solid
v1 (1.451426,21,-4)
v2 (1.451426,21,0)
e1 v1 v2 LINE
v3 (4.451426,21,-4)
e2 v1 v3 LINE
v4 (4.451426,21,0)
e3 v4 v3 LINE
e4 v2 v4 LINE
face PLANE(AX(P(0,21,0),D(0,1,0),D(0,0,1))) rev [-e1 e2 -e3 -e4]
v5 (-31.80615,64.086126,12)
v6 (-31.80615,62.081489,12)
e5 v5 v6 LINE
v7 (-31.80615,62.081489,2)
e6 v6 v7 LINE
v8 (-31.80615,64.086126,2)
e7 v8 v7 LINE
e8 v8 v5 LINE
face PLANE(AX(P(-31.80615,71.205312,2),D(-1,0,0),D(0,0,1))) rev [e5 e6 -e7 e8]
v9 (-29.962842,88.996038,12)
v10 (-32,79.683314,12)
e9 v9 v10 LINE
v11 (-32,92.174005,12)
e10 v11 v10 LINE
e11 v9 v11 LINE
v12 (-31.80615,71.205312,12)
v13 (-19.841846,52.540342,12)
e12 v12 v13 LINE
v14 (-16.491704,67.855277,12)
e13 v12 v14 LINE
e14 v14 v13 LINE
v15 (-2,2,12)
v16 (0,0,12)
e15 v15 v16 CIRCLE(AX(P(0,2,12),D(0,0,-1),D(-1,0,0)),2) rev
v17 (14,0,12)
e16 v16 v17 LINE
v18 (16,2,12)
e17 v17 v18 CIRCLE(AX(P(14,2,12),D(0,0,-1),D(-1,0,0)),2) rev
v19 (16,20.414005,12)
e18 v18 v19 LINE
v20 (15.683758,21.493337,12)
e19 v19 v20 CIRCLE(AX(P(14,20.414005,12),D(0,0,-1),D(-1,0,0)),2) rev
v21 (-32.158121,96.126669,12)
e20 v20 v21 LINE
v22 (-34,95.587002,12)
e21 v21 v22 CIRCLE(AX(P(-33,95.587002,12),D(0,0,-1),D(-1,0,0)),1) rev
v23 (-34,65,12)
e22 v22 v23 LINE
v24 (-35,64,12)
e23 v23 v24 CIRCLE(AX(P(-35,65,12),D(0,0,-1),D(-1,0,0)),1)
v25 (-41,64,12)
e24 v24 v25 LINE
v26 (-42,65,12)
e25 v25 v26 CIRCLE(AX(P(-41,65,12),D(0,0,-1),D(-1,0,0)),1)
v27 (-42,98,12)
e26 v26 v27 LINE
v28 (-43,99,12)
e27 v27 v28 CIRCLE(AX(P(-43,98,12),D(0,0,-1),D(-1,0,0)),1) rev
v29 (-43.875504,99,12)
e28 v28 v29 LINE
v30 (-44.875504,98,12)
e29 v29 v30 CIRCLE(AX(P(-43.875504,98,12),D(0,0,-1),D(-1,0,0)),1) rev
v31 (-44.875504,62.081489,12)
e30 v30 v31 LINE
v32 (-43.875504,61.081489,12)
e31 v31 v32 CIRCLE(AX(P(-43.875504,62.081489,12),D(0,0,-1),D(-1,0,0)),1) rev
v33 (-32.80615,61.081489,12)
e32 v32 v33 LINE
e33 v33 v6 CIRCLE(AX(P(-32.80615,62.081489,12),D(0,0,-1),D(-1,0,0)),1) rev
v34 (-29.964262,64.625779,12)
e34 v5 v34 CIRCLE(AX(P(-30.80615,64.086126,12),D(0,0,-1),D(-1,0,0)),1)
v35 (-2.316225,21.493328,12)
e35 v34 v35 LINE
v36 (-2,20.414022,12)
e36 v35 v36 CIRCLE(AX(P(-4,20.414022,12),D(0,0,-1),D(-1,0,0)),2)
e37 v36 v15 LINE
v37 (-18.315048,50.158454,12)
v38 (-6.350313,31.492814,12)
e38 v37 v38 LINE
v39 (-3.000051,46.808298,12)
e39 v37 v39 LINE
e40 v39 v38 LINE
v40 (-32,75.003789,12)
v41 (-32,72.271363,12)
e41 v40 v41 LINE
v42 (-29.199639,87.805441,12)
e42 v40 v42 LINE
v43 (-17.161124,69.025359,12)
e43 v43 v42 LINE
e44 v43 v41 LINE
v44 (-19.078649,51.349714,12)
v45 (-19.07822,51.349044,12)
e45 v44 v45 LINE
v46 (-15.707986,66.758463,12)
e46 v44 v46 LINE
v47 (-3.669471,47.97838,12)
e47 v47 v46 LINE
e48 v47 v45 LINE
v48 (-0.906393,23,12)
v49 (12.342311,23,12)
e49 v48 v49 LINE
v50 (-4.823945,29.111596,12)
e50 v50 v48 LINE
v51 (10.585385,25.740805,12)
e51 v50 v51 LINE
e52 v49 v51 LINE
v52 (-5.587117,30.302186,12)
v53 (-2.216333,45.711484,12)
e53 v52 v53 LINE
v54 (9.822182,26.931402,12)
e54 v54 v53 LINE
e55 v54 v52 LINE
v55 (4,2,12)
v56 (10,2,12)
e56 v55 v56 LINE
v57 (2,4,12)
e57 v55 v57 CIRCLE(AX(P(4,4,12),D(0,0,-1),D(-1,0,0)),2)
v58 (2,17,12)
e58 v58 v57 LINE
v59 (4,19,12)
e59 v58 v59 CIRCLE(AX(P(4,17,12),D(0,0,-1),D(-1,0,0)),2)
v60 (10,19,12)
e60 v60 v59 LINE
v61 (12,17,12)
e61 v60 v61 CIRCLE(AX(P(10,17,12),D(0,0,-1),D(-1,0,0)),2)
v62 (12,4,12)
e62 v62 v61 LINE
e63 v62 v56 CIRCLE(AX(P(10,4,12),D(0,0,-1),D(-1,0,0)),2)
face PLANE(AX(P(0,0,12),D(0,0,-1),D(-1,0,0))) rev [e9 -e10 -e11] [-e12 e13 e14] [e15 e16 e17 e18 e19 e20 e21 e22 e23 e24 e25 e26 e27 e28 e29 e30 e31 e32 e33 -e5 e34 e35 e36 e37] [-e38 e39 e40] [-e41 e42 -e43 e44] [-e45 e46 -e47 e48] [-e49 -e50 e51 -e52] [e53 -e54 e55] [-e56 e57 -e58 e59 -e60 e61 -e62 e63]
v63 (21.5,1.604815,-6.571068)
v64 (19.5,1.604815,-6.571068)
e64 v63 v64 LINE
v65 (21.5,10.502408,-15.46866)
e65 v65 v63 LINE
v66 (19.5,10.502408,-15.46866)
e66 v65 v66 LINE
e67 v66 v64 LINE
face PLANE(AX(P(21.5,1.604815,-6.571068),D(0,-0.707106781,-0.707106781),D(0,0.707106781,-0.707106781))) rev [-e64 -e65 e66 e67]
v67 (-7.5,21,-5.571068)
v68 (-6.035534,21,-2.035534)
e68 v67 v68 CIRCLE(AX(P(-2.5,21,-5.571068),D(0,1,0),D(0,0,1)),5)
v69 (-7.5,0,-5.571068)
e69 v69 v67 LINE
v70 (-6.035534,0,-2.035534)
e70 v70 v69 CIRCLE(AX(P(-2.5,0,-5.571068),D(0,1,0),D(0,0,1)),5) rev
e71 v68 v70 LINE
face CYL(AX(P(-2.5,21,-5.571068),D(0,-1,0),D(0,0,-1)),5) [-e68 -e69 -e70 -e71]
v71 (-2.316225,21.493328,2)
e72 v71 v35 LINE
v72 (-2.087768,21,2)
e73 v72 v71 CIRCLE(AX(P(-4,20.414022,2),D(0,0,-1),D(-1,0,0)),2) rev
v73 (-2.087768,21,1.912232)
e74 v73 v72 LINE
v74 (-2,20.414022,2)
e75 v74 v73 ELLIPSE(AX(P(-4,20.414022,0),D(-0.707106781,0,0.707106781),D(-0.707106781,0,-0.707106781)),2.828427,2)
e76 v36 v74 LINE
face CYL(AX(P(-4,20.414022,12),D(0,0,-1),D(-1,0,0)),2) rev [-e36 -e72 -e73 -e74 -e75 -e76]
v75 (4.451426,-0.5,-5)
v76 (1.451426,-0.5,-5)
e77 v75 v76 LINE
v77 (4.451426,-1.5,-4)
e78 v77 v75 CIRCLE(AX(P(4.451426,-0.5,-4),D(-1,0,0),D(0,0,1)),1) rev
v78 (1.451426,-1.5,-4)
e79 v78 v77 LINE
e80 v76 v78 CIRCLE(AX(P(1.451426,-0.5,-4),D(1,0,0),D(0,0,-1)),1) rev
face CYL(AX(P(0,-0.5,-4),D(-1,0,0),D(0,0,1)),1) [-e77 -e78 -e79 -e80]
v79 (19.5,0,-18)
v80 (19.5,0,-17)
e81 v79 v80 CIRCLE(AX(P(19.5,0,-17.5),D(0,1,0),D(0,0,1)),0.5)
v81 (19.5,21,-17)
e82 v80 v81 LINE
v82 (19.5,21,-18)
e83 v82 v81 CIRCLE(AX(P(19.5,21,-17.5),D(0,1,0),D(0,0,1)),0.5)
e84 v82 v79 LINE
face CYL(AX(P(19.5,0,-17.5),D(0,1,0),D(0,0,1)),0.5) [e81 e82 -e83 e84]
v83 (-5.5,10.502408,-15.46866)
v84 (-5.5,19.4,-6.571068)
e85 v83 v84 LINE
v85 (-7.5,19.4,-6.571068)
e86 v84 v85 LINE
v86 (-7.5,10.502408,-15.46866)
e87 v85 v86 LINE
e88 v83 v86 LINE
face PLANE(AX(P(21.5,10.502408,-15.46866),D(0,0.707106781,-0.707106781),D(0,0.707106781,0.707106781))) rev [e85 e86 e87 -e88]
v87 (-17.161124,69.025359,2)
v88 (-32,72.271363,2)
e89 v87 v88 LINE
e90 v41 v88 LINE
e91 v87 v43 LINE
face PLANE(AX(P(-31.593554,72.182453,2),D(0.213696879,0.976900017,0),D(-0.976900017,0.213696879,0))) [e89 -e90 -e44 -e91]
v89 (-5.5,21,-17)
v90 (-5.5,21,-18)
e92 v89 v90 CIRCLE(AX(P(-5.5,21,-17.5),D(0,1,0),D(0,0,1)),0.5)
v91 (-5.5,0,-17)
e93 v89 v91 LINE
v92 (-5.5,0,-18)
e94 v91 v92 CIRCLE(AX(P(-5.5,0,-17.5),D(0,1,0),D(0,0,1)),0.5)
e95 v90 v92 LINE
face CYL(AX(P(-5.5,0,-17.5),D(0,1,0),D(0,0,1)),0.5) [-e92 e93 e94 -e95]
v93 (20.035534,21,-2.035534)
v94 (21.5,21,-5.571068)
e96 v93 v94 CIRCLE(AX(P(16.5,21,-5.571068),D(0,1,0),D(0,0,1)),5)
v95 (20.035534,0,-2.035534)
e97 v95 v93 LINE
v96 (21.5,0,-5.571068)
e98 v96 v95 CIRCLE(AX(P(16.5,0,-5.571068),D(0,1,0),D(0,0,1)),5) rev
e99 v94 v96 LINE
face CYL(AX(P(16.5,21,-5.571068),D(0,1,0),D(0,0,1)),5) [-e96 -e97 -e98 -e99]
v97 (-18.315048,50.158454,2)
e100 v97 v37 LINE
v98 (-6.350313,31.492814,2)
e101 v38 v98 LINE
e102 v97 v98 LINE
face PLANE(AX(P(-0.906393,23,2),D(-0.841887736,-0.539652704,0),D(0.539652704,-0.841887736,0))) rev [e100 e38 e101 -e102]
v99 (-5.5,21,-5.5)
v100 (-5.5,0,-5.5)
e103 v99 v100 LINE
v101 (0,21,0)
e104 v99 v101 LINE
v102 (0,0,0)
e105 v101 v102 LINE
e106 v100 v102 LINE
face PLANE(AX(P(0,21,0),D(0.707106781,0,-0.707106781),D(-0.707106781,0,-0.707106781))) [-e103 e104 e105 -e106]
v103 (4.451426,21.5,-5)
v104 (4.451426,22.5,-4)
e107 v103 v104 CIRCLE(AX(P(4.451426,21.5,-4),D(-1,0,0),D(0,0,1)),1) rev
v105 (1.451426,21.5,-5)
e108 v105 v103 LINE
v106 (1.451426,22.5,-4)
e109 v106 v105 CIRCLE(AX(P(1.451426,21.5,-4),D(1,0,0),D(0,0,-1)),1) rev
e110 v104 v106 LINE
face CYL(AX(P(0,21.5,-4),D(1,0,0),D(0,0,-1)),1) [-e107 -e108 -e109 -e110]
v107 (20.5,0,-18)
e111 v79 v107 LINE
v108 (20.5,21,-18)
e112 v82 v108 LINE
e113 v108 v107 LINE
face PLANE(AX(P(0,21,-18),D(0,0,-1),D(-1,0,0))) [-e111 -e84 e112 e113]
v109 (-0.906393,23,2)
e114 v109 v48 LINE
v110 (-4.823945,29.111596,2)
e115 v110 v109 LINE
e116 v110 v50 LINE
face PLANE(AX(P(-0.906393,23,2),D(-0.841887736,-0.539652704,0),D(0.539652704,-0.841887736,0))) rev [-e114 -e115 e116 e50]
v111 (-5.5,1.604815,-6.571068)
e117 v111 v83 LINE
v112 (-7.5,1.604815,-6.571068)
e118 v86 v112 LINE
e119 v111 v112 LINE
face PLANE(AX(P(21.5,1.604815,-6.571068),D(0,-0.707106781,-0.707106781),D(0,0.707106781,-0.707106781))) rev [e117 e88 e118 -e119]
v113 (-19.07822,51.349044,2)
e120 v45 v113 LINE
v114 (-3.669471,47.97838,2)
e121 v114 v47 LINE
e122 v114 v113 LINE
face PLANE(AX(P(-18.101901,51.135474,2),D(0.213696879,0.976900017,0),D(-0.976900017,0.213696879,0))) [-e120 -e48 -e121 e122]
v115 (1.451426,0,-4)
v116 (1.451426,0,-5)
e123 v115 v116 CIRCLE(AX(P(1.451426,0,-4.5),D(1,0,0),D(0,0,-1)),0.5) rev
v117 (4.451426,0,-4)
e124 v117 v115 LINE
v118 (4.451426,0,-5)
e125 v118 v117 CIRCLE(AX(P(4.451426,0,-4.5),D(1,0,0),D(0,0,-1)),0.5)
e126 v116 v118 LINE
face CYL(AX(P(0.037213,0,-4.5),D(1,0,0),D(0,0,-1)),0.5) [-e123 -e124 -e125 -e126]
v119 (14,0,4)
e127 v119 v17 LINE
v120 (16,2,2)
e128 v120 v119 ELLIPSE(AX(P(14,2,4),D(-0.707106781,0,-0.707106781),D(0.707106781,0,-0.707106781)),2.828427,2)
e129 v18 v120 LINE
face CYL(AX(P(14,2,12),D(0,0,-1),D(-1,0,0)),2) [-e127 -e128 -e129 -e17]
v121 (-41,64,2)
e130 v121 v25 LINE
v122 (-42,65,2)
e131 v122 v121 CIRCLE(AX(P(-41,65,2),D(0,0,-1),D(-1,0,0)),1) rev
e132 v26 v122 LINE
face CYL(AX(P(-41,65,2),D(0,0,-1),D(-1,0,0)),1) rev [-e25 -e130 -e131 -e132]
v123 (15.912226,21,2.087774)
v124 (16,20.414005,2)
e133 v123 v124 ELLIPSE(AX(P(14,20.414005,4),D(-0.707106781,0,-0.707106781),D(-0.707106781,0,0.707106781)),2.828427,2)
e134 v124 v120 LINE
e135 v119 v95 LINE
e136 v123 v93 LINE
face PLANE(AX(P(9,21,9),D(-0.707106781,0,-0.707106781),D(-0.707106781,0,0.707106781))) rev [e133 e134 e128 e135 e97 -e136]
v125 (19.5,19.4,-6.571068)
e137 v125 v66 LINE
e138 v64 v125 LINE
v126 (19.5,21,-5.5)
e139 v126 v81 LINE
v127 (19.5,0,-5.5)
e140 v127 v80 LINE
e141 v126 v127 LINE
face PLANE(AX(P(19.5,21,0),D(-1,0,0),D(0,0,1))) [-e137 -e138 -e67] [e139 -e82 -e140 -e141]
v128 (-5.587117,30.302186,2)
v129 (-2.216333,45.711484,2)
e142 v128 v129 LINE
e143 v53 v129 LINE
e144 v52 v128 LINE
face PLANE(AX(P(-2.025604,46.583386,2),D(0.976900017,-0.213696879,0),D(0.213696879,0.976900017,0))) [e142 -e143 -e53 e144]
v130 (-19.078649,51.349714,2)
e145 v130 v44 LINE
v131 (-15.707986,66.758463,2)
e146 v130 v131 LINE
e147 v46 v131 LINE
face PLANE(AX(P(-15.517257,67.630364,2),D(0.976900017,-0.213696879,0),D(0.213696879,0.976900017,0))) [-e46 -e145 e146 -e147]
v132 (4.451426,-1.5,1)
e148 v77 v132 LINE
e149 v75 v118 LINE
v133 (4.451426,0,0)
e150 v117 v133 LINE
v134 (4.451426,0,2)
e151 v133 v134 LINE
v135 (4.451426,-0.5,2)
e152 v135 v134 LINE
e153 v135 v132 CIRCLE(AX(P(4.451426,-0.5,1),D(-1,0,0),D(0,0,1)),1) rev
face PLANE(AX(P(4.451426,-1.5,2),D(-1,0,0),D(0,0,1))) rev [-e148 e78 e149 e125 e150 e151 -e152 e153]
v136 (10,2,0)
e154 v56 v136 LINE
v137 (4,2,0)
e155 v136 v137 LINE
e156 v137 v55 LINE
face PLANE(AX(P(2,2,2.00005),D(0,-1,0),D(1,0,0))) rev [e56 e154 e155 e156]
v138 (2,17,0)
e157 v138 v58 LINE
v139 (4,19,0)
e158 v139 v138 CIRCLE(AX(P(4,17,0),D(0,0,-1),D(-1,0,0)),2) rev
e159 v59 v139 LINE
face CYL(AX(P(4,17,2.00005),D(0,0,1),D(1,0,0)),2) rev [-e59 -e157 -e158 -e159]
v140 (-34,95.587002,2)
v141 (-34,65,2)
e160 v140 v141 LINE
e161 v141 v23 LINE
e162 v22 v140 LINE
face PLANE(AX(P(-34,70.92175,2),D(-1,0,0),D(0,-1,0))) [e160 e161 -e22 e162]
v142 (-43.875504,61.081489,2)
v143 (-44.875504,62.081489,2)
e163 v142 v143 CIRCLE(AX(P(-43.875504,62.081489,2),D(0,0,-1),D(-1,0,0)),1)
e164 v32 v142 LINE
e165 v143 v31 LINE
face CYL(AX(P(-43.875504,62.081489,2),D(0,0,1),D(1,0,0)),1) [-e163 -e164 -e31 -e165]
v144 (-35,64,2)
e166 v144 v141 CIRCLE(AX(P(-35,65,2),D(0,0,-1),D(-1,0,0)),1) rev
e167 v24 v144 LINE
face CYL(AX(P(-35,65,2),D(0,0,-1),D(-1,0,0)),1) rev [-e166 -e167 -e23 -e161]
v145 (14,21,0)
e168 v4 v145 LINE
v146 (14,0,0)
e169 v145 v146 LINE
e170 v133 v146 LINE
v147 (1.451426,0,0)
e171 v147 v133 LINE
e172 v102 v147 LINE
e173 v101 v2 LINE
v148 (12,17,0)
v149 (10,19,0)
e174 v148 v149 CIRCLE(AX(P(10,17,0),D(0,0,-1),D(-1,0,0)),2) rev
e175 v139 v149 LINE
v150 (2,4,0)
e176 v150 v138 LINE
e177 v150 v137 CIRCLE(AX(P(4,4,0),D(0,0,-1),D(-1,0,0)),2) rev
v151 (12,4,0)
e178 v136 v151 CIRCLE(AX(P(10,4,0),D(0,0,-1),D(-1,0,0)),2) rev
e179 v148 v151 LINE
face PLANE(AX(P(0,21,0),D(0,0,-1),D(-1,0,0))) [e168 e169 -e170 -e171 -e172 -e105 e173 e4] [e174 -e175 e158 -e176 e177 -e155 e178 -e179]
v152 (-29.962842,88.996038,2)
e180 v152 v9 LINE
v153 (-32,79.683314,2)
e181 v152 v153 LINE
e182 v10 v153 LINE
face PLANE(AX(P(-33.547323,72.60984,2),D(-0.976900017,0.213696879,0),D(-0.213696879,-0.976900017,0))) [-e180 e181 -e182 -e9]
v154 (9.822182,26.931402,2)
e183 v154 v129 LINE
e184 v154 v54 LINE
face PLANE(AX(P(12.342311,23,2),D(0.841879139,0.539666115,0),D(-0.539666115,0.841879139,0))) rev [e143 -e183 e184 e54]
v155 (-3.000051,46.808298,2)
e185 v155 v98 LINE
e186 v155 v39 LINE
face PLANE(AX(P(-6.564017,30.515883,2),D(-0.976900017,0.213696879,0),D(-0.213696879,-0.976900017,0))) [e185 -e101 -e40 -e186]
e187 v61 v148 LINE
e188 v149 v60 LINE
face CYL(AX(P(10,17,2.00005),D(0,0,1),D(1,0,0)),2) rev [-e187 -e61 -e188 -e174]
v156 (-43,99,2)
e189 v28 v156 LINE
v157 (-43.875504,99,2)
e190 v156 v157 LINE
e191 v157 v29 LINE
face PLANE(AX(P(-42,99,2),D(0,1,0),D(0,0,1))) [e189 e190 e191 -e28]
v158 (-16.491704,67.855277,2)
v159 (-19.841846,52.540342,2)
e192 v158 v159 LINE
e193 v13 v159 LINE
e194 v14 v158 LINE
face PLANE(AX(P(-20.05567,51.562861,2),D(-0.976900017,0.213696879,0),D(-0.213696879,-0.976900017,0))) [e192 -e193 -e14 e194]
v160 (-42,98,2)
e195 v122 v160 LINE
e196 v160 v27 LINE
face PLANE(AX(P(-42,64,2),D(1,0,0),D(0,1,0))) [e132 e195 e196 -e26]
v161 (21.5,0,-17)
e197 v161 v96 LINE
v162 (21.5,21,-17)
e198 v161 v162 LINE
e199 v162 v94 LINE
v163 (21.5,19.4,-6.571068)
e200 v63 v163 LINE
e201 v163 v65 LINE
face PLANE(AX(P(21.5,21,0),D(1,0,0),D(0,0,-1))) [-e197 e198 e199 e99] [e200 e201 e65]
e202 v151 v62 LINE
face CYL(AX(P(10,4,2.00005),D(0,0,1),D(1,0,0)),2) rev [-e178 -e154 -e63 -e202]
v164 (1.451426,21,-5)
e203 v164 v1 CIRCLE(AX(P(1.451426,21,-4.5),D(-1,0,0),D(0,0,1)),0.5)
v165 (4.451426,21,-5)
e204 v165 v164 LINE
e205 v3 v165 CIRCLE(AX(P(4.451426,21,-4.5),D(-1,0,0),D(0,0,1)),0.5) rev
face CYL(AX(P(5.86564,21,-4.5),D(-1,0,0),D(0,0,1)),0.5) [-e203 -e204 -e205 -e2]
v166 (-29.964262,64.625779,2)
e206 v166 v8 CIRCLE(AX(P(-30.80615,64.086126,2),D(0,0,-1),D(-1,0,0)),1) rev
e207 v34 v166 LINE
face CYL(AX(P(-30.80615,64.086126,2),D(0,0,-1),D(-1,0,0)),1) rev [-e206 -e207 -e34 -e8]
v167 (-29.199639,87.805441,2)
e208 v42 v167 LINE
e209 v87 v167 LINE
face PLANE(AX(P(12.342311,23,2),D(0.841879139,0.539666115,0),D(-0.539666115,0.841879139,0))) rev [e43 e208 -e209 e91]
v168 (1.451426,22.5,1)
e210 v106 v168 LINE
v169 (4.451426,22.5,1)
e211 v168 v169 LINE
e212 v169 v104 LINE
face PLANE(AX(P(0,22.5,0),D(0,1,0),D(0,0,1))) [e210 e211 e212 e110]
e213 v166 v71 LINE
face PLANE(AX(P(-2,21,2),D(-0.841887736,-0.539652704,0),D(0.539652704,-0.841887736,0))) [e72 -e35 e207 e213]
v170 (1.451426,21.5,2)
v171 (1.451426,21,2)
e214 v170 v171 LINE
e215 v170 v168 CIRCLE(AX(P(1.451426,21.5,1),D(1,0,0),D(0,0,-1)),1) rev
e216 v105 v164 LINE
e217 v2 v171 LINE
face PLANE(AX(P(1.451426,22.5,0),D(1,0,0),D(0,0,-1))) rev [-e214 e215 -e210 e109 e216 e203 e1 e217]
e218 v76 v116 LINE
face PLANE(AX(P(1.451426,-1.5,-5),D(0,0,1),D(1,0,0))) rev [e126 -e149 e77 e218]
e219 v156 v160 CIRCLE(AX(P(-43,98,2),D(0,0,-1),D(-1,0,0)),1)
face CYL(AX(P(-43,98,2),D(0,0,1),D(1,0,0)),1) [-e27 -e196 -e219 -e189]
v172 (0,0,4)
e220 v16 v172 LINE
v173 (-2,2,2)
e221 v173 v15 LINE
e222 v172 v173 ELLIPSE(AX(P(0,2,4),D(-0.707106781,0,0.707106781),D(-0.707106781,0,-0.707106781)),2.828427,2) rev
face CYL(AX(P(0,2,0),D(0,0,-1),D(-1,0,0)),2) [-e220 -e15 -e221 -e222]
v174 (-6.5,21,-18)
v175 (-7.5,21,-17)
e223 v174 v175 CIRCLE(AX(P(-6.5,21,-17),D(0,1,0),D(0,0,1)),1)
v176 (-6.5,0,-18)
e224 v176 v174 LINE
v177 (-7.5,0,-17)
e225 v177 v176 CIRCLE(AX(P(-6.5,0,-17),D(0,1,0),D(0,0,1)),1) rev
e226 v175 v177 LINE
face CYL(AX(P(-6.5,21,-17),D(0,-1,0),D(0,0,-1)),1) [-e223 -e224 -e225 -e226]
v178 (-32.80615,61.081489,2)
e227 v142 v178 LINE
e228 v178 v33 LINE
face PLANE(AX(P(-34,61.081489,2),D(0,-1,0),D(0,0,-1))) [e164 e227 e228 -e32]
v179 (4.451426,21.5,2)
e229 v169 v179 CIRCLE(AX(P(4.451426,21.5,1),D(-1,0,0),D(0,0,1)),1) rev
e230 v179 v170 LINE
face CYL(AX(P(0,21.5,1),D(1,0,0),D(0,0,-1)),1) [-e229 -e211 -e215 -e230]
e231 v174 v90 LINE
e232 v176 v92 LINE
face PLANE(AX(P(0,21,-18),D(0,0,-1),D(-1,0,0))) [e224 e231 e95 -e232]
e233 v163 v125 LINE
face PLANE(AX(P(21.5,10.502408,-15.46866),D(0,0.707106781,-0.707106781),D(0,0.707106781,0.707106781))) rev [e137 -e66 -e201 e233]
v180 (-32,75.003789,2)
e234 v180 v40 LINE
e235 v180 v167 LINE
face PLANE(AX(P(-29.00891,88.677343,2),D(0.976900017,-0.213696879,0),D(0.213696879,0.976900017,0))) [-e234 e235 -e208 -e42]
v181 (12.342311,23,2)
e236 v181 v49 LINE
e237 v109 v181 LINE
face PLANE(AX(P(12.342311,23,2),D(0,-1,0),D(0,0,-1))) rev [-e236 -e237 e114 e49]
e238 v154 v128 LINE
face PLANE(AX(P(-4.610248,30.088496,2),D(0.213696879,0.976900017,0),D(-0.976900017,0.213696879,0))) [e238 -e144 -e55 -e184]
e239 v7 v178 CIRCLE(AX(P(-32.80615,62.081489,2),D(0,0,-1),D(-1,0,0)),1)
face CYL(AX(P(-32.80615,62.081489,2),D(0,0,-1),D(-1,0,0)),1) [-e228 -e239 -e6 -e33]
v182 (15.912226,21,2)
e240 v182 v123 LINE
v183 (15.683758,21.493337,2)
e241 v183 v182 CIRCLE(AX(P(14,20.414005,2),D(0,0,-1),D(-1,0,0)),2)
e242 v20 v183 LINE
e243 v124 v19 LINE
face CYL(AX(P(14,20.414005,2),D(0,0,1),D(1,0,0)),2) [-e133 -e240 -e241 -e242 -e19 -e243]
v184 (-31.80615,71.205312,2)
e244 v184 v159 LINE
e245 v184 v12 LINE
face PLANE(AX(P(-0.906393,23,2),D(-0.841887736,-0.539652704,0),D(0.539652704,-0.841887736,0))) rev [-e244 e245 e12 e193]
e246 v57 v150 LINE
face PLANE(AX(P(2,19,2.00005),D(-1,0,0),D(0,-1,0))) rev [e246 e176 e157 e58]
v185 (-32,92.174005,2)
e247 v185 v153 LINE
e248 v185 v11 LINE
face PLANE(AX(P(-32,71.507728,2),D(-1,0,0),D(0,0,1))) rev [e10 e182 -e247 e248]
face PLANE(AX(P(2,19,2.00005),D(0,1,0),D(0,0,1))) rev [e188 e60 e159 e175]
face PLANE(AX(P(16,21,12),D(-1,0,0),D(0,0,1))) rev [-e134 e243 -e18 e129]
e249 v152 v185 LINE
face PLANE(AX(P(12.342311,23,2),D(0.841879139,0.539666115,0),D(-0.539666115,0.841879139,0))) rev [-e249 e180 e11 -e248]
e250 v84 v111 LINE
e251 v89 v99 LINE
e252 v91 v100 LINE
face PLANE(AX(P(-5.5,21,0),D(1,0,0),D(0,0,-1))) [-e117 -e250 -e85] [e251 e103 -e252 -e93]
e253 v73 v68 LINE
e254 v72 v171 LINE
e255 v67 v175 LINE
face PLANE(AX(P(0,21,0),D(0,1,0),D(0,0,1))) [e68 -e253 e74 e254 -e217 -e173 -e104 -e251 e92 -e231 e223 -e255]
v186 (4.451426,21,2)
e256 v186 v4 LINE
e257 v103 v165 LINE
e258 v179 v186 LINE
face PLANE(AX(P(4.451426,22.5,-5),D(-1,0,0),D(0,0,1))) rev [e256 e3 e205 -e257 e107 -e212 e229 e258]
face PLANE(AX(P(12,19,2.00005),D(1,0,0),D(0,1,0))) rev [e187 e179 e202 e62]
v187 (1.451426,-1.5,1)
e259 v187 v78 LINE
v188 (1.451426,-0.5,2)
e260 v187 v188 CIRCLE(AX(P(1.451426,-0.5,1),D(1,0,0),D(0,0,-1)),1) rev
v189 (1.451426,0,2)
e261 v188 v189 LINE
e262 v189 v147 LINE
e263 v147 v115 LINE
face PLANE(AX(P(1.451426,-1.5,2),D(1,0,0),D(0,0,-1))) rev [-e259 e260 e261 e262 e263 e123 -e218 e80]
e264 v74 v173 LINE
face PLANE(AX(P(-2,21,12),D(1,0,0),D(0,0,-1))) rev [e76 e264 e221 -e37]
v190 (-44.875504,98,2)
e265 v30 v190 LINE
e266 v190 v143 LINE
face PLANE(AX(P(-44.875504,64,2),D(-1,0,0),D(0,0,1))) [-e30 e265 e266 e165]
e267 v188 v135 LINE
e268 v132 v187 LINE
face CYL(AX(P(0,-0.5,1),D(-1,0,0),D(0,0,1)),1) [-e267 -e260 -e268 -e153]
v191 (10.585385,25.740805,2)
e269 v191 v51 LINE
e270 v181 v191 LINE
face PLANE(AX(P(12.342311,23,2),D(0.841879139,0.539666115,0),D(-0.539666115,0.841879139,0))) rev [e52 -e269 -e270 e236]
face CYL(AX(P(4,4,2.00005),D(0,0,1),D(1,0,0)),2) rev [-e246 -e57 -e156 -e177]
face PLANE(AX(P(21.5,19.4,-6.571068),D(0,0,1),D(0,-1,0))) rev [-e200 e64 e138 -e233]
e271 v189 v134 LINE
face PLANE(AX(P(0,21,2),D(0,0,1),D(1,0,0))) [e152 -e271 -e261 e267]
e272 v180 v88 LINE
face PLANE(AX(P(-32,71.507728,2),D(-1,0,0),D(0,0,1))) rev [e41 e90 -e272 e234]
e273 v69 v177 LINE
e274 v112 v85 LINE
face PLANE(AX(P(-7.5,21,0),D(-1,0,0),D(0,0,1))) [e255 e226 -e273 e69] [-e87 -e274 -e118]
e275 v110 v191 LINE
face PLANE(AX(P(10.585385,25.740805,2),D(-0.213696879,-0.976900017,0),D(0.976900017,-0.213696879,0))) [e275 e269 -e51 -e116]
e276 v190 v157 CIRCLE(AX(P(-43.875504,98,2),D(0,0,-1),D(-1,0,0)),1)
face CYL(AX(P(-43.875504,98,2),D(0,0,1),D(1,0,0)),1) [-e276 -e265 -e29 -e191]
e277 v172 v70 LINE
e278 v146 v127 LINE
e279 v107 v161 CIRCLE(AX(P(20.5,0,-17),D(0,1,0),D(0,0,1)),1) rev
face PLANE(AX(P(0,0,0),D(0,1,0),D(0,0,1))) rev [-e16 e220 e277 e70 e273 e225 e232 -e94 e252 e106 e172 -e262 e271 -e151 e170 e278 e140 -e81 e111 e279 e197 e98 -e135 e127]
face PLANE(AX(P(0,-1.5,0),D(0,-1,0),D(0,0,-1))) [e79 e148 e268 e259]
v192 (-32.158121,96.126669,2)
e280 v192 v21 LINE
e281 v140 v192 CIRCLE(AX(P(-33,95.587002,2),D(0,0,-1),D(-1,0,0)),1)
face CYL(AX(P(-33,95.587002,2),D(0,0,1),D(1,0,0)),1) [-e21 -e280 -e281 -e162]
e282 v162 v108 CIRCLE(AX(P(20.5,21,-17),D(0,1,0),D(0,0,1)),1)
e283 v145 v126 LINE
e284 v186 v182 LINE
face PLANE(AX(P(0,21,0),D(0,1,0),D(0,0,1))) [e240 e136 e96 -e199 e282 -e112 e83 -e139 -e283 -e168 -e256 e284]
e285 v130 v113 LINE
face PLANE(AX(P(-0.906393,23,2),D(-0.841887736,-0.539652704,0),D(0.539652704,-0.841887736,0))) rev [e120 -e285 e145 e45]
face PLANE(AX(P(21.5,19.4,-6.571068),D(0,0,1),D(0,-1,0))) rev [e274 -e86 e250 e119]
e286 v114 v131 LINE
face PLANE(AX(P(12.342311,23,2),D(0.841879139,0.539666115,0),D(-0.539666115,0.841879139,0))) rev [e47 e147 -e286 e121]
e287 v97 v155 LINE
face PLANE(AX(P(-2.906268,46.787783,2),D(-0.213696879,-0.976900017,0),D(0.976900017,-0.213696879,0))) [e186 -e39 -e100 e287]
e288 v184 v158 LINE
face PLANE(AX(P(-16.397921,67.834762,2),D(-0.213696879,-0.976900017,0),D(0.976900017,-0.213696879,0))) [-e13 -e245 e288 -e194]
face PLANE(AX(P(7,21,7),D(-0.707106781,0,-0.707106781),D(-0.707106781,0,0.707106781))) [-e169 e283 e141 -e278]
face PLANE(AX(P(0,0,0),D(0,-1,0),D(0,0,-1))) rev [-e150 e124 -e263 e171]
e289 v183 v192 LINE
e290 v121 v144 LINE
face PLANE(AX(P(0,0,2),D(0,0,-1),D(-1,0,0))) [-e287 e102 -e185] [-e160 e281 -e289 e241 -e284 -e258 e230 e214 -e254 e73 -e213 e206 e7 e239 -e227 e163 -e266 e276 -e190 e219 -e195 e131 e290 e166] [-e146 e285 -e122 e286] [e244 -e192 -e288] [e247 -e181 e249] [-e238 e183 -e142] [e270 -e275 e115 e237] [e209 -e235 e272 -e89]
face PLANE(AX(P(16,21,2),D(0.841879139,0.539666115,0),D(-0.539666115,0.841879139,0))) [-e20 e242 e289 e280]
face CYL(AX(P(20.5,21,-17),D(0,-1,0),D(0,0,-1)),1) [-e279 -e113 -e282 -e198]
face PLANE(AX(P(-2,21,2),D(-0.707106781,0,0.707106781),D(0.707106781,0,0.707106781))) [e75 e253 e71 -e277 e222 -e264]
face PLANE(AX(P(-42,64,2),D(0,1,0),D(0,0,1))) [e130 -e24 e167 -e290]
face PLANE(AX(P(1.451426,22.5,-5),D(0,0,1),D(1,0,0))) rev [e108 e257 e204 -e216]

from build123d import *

# Parameters (mm, degrees)
BOSS_EXTRUDE2_DEPTH  = 21
FILLET1_R            = 5
SKETCH4_R            = 0.5
BOSS_EXTRUDE3_DEPTH  = 21
SKETCH5_R            = 0.5
BOSS_EXTRUDE4_DEPTH  = 21
FILLET2_R            = 1
BOSS_EXTRUDE5_DEPTH  = 1.5
FILLET3_R            = 1
FILLET4_R            = 1
SKETCH7_R            = 0.5
BOSS_EXTRUDE6_DEPTH  = 3
SKETCH8_W            = 3
SKETCH8_H            = 7
BOSS_EXTRUDE7_DEPTH  = 1.5
FILLET5_R            = 1
SKETCH9_R            = 0.5
BOSS_EXTRUDE8_DEPTH  = 3
SKETCH10_W           = 10
SKETCH10_H           = 17
CUT_EXTRUDE1_DEPTH   = 36.951356024
CUT_EXTRUDE2_DEPTH   = 41.880924647
SKETCH12_W           = 18
SKETCH12_H           = 21
SKETCH12_W_2         = 10
SKETCH12_H_2         = 17
BOSS_EXTRUDE9_DEPTH  = 10
BOSS_EXTRUDE10_DEPTH = 10
BOSS_EXTRUDE14_DEPTH = 10
BOSS_EXTRUDE15_DEPTH = 10
LPATTERN1_START      = 2
LPATTERN1_DEPTH      = 10
SKETCH17_W           = 2.875504222
SKETCH17_H           = 35
BOSS_EXTRUDE16_DEPTH = 10
BOSS_EXTRUDE17_DEPTH = 10
FILLET6_R            = 1
FILLET7_R            = 1
FILLET8_R            = 1
FILLET9_R            = 2


# Read off the part's stored shape, not the designer's step: LPattern1
with BuildPart() as part:
    # Sketch3 → Boss-Extrude2 (new body)
    with BuildSketch(Plane(origin=(0, 0, 0), x_dir=(1, 0, 0), z_dir=(0, 1, 0))):
        Polygon((0, 0), (-5.5, 5.5), (-5.5, 18), (-7.5, 18), (-7.5, 3.5), (-2, -2), (16, -2), (21.5, 3.5), (21.5, 18), (19.5, 18), (19.5, 5.5), (14, 0), align=None)
    extrude(amount=BOSS_EXTRUDE2_DEPTH)

    # Fillet1
    fillet1_edges = [part.edges().sort_by_distance(p)[0] for p in [
        (-7.5, 10.5, -3.5),
        (21.5, 10.5, -3.5),
    ]]
    fillet(fillet1_edges, radius=FILLET1_R)

    # Sketch4 → Boss-Extrude3 (add)
    with BuildSketch(Plane(origin=(0, 21, 0), x_dir=(1, 0, 0), z_dir=(0, 1, 0))):
        with Locations((-5.5, 17.5)):
            Circle(SKETCH4_R)
    extrude(amount=-BOSS_EXTRUDE3_DEPTH)

    # Sketch5 → Boss-Extrude4 (add)
    with BuildSketch(Plane(origin=(0, 21, 0), x_dir=(1, 0, 0), z_dir=(0, 1, 0))):
        with Locations((19.5, 17.5)):
            Circle(SKETCH5_R)
    extrude(amount=-BOSS_EXTRUDE4_DEPTH)

    # Fillet2
    fillet2_edges = [part.edges().sort_by_distance(p)[0] for p in [
        (-7.5, 10.5, -18),
        (21.5, 10.5, -18),
    ]]
    fillet(fillet2_edges, radius=FILLET2_R)

    # Sketch6 → Boss-Extrude5 (add)
    with BuildSketch(Plane(origin=(0, 21, 0), x_dir=(1, 0, 0), z_dir=(0, 1, 0))):
        Polygon((1.451426333, 5), (1.451426333, 0), (1.451426333, -2), (4.451426333, -2), (4.451426333, 0), (4.451426333, 5), align=None)
    extrude(amount=BOSS_EXTRUDE5_DEPTH)

    # Fillet3
    fillet3_edges = [part.edges().sort_by_distance(p)[0] for p in [
        (2.951426333, 22.5, 2),
    ]]
    fillet(fillet3_edges, radius=FILLET3_R)

    # Fillet4
    fillet4_edges = [part.edges().sort_by_distance(p)[0] for p in [
        (2.951426333, 22.5, -5),
    ]]
    fillet(fillet4_edges, radius=FILLET4_R)

    # Sketch7 → Boss-Extrude6 (add)
    with BuildSketch(Plane.ZY.offset(-1.451426333)):
        with Locations((-4.5, 21)):
            Circle(SKETCH7_R)
    extrude(amount=-BOSS_EXTRUDE6_DEPTH)

    # Sketch8 → Boss-Extrude7 (add)
    with BuildSketch(Plane.XZ):
        with Locations((2.951426333, -1.5)):
            Rectangle(SKETCH8_W, SKETCH8_H)
    extrude(amount=BOSS_EXTRUDE7_DEPTH)

    # Fillet5
    fillet5_edges = [part.edges().sort_by_distance(p)[0] for p in [
        (2.951426333, -1.5, -5),
        (2.951426333, -1.5, 2),
    ]]
    fillet(fillet5_edges, radius=FILLET5_R)

    # Sketch9 → Boss-Extrude8 (add)
    with BuildSketch(Plane(origin=(4.451426333, 0, 0), x_dir=(0, 0, -1), z_dir=(1, 0, 0))):
        with Locations((4.5, 0)):
            Circle(SKETCH9_R)
    extrude(amount=-BOSS_EXTRUDE8_DEPTH)

    # Sketch10 → Cut-Extrude1 (cut, through all)
    with BuildSketch(Plane(origin=(0, 0, 0), x_dir=(-1, 0, 0), z_dir=(0, 0, -1))):
        with Locations((-7, 10.5)):
            Rectangle(SKETCH10_W, SKETCH10_H)
    extrude(amount=-CUT_EXTRUDE1_DEPTH, mode=Mode.SUBTRACT)

    # Sketch11 → Cut-Extrude2 (cut, through all)
    with BuildSketch(Plane.ZY.offset(7.5)):
        Polygon((-6.571067812, 19.4), (-6.571067812, 1.604815424), (-15.4686601, 10.502407712), align=None)
    extrude(amount=-CUT_EXTRUDE2_DEPTH, mode=Mode.SUBTRACT)

    # Sketch12 → Boss-Extrude9 (add)
    with BuildSketch(Plane.XY.offset(2)):
        with Locations((7, 10.5)):
            Rectangle(SKETCH12_W, SKETCH12_H)
        with Locations((7, 10.5)):
            Rectangle(SKETCH12_W_2, SKETCH12_H_2, mode=Mode.SUBTRACT)
    extrude(amount=BOSS_EXTRUDE9_DEPTH)

    # Sketch13 → Boss-Extrude10 (add)
    with BuildSketch(Plane.XY.offset(12)):
        Polygon((16, 21), (-34, 99), (-34, 70.921750355), (-2, 21), align=None)
        Polygon((-0.906392677, 23), (-32, 71.507728201), (-32, 92.174004857), (12.342310806, 23), align=None, mode=Mode.SUBTRACT)
    extrude(amount=-BOSS_EXTRUDE10_DEPTH)

    # Sketch14 → Boss-Extrude14 (add)
    with BuildSketch(Plane.XY.offset(12)):
        Polygon((10.585384641, 25.740804817), (-4.823944827, 29.111595638), (-6.748576082, 29.532608725), (-6.534879203, 30.509508743), (-4.610247948, 30.088495656), (10.79908152, 26.717704835), align=None)
    extrude(amount=-BOSS_EXTRUDE14_DEPTH)

    # Sketch16 → Boss-Extrude15 (add)
    with BuildSketch(Plane.XY.offset(12)):
        Polygon((-5.587116842, 30.302185726), (-2.216332829, 45.71148407), (-2.025604345, 46.583385709), (-1.775197733, 47.728101652), (-2.75209775, 47.941798531), (-3.002504363, 46.797082588), (-3.193232846, 45.925180949), (-6.564016859, 30.515882605), align=None)
    extrude(amount=-BOSS_EXTRUDE15_DEPTH)

    # LPattern1 outline → LPattern1 (add)
    with BuildSketch(Plane.XY.offset(LPATTERN1_START)):
        Polygon((-2.979535968, 46.902080966), (-3.669471366, 47.978380187), (-19.078219518, 51.349043846), (-18.315047503, 50.158453758), (-3.000050935, 46.808298259), align=None)
        Polygon((-19.078649352, 51.349714409), (-15.707985697, 66.758462544), (-17.161124234, 69.025358662), (-32, 72.271362735), (-32, 71.507728201), (-31.80615018, 71.205311878), (-16.491703803, 67.855276733), (-19.841845682, 52.54034243), align=None)
        Polygon((-32, 75.003788744), (-29.199638565, 87.805441018), (-29.962841704, 88.996037915), (-32, 79.683314274), align=None)
    extrude(amount=LPATTERN1_DEPTH)



with BuildPart() as body_2:
    # Sketch17 → Boss-Extrude16 (new body)
    with BuildSketch(Plane.XY.offset(12)):
        with Locations((-43.437752111, 81.5)):
            Rectangle(SKETCH17_W, SKETCH17_H)
    extrude(amount=-BOSS_EXTRUDE16_DEPTH)


with BuildPart() as part_1:
    add(part.part)

    add(body_2.part)  # Boss-Extrude17 merges body 2
    # Sketch18 → Boss-Extrude17 (add)
    with BuildSketch(Plane.XY.offset(12)):
        Polygon((-34, 64), (-34, 71.035157721), (-31.80615018, 71.205311878), (-31.80615018, 61.08148926), (-34, 61.08148926), (-44.875504222, 61.08148926), (-44.875504222, 64), (-42, 64), align=None)
    extrude(amount=-BOSS_EXTRUDE17_DEPTH)

    # Fillet6
    fillet6_edges = [part_1.edges().sort_by_distance(p)[0] for p in [
        (-31.80615018, 67.499224635, 7),
    ]]
    fillet(fillet6_edges, radius=FILLET6_R)

    # Fillet7
    fillet7_edges = [part_1.edges().sort_by_distance(p)[0] for p in [
        (-34, 99, 7),
        (-44.875504222, 61.08148926, 7),
        (-31.80615018, 61.08148926, 7),
        (-42, 99, 7),
        (-44.875504222, 99, 7),
    ]]
    fillet(fillet7_edges, radius=FILLET7_R)

    # Fillet8
    fillet8_edges = [part_1.edges().sort_by_distance(p)[0] for p in [
        (-34, 64, 7),
        (-42, 64, 7),
    ]]
    fillet(fillet8_edges, radius=FILLET8_R)

    # Fillet9
    fillet9_edges = [part_1.edges().sort_by_distance(p)[0] for p in [
        (2, 19, 6),
        (2, 2, 6),
        (12, 2, 6),
        (12, 19, 6),
        (16, 0, 7),
        (16, 21, 7),
        (-2, 21, 7),
        (-2, 0, 7),
    ]]
    fillet(fillet9_edges, radius=FILLET9_R)


solid = part_1.part
